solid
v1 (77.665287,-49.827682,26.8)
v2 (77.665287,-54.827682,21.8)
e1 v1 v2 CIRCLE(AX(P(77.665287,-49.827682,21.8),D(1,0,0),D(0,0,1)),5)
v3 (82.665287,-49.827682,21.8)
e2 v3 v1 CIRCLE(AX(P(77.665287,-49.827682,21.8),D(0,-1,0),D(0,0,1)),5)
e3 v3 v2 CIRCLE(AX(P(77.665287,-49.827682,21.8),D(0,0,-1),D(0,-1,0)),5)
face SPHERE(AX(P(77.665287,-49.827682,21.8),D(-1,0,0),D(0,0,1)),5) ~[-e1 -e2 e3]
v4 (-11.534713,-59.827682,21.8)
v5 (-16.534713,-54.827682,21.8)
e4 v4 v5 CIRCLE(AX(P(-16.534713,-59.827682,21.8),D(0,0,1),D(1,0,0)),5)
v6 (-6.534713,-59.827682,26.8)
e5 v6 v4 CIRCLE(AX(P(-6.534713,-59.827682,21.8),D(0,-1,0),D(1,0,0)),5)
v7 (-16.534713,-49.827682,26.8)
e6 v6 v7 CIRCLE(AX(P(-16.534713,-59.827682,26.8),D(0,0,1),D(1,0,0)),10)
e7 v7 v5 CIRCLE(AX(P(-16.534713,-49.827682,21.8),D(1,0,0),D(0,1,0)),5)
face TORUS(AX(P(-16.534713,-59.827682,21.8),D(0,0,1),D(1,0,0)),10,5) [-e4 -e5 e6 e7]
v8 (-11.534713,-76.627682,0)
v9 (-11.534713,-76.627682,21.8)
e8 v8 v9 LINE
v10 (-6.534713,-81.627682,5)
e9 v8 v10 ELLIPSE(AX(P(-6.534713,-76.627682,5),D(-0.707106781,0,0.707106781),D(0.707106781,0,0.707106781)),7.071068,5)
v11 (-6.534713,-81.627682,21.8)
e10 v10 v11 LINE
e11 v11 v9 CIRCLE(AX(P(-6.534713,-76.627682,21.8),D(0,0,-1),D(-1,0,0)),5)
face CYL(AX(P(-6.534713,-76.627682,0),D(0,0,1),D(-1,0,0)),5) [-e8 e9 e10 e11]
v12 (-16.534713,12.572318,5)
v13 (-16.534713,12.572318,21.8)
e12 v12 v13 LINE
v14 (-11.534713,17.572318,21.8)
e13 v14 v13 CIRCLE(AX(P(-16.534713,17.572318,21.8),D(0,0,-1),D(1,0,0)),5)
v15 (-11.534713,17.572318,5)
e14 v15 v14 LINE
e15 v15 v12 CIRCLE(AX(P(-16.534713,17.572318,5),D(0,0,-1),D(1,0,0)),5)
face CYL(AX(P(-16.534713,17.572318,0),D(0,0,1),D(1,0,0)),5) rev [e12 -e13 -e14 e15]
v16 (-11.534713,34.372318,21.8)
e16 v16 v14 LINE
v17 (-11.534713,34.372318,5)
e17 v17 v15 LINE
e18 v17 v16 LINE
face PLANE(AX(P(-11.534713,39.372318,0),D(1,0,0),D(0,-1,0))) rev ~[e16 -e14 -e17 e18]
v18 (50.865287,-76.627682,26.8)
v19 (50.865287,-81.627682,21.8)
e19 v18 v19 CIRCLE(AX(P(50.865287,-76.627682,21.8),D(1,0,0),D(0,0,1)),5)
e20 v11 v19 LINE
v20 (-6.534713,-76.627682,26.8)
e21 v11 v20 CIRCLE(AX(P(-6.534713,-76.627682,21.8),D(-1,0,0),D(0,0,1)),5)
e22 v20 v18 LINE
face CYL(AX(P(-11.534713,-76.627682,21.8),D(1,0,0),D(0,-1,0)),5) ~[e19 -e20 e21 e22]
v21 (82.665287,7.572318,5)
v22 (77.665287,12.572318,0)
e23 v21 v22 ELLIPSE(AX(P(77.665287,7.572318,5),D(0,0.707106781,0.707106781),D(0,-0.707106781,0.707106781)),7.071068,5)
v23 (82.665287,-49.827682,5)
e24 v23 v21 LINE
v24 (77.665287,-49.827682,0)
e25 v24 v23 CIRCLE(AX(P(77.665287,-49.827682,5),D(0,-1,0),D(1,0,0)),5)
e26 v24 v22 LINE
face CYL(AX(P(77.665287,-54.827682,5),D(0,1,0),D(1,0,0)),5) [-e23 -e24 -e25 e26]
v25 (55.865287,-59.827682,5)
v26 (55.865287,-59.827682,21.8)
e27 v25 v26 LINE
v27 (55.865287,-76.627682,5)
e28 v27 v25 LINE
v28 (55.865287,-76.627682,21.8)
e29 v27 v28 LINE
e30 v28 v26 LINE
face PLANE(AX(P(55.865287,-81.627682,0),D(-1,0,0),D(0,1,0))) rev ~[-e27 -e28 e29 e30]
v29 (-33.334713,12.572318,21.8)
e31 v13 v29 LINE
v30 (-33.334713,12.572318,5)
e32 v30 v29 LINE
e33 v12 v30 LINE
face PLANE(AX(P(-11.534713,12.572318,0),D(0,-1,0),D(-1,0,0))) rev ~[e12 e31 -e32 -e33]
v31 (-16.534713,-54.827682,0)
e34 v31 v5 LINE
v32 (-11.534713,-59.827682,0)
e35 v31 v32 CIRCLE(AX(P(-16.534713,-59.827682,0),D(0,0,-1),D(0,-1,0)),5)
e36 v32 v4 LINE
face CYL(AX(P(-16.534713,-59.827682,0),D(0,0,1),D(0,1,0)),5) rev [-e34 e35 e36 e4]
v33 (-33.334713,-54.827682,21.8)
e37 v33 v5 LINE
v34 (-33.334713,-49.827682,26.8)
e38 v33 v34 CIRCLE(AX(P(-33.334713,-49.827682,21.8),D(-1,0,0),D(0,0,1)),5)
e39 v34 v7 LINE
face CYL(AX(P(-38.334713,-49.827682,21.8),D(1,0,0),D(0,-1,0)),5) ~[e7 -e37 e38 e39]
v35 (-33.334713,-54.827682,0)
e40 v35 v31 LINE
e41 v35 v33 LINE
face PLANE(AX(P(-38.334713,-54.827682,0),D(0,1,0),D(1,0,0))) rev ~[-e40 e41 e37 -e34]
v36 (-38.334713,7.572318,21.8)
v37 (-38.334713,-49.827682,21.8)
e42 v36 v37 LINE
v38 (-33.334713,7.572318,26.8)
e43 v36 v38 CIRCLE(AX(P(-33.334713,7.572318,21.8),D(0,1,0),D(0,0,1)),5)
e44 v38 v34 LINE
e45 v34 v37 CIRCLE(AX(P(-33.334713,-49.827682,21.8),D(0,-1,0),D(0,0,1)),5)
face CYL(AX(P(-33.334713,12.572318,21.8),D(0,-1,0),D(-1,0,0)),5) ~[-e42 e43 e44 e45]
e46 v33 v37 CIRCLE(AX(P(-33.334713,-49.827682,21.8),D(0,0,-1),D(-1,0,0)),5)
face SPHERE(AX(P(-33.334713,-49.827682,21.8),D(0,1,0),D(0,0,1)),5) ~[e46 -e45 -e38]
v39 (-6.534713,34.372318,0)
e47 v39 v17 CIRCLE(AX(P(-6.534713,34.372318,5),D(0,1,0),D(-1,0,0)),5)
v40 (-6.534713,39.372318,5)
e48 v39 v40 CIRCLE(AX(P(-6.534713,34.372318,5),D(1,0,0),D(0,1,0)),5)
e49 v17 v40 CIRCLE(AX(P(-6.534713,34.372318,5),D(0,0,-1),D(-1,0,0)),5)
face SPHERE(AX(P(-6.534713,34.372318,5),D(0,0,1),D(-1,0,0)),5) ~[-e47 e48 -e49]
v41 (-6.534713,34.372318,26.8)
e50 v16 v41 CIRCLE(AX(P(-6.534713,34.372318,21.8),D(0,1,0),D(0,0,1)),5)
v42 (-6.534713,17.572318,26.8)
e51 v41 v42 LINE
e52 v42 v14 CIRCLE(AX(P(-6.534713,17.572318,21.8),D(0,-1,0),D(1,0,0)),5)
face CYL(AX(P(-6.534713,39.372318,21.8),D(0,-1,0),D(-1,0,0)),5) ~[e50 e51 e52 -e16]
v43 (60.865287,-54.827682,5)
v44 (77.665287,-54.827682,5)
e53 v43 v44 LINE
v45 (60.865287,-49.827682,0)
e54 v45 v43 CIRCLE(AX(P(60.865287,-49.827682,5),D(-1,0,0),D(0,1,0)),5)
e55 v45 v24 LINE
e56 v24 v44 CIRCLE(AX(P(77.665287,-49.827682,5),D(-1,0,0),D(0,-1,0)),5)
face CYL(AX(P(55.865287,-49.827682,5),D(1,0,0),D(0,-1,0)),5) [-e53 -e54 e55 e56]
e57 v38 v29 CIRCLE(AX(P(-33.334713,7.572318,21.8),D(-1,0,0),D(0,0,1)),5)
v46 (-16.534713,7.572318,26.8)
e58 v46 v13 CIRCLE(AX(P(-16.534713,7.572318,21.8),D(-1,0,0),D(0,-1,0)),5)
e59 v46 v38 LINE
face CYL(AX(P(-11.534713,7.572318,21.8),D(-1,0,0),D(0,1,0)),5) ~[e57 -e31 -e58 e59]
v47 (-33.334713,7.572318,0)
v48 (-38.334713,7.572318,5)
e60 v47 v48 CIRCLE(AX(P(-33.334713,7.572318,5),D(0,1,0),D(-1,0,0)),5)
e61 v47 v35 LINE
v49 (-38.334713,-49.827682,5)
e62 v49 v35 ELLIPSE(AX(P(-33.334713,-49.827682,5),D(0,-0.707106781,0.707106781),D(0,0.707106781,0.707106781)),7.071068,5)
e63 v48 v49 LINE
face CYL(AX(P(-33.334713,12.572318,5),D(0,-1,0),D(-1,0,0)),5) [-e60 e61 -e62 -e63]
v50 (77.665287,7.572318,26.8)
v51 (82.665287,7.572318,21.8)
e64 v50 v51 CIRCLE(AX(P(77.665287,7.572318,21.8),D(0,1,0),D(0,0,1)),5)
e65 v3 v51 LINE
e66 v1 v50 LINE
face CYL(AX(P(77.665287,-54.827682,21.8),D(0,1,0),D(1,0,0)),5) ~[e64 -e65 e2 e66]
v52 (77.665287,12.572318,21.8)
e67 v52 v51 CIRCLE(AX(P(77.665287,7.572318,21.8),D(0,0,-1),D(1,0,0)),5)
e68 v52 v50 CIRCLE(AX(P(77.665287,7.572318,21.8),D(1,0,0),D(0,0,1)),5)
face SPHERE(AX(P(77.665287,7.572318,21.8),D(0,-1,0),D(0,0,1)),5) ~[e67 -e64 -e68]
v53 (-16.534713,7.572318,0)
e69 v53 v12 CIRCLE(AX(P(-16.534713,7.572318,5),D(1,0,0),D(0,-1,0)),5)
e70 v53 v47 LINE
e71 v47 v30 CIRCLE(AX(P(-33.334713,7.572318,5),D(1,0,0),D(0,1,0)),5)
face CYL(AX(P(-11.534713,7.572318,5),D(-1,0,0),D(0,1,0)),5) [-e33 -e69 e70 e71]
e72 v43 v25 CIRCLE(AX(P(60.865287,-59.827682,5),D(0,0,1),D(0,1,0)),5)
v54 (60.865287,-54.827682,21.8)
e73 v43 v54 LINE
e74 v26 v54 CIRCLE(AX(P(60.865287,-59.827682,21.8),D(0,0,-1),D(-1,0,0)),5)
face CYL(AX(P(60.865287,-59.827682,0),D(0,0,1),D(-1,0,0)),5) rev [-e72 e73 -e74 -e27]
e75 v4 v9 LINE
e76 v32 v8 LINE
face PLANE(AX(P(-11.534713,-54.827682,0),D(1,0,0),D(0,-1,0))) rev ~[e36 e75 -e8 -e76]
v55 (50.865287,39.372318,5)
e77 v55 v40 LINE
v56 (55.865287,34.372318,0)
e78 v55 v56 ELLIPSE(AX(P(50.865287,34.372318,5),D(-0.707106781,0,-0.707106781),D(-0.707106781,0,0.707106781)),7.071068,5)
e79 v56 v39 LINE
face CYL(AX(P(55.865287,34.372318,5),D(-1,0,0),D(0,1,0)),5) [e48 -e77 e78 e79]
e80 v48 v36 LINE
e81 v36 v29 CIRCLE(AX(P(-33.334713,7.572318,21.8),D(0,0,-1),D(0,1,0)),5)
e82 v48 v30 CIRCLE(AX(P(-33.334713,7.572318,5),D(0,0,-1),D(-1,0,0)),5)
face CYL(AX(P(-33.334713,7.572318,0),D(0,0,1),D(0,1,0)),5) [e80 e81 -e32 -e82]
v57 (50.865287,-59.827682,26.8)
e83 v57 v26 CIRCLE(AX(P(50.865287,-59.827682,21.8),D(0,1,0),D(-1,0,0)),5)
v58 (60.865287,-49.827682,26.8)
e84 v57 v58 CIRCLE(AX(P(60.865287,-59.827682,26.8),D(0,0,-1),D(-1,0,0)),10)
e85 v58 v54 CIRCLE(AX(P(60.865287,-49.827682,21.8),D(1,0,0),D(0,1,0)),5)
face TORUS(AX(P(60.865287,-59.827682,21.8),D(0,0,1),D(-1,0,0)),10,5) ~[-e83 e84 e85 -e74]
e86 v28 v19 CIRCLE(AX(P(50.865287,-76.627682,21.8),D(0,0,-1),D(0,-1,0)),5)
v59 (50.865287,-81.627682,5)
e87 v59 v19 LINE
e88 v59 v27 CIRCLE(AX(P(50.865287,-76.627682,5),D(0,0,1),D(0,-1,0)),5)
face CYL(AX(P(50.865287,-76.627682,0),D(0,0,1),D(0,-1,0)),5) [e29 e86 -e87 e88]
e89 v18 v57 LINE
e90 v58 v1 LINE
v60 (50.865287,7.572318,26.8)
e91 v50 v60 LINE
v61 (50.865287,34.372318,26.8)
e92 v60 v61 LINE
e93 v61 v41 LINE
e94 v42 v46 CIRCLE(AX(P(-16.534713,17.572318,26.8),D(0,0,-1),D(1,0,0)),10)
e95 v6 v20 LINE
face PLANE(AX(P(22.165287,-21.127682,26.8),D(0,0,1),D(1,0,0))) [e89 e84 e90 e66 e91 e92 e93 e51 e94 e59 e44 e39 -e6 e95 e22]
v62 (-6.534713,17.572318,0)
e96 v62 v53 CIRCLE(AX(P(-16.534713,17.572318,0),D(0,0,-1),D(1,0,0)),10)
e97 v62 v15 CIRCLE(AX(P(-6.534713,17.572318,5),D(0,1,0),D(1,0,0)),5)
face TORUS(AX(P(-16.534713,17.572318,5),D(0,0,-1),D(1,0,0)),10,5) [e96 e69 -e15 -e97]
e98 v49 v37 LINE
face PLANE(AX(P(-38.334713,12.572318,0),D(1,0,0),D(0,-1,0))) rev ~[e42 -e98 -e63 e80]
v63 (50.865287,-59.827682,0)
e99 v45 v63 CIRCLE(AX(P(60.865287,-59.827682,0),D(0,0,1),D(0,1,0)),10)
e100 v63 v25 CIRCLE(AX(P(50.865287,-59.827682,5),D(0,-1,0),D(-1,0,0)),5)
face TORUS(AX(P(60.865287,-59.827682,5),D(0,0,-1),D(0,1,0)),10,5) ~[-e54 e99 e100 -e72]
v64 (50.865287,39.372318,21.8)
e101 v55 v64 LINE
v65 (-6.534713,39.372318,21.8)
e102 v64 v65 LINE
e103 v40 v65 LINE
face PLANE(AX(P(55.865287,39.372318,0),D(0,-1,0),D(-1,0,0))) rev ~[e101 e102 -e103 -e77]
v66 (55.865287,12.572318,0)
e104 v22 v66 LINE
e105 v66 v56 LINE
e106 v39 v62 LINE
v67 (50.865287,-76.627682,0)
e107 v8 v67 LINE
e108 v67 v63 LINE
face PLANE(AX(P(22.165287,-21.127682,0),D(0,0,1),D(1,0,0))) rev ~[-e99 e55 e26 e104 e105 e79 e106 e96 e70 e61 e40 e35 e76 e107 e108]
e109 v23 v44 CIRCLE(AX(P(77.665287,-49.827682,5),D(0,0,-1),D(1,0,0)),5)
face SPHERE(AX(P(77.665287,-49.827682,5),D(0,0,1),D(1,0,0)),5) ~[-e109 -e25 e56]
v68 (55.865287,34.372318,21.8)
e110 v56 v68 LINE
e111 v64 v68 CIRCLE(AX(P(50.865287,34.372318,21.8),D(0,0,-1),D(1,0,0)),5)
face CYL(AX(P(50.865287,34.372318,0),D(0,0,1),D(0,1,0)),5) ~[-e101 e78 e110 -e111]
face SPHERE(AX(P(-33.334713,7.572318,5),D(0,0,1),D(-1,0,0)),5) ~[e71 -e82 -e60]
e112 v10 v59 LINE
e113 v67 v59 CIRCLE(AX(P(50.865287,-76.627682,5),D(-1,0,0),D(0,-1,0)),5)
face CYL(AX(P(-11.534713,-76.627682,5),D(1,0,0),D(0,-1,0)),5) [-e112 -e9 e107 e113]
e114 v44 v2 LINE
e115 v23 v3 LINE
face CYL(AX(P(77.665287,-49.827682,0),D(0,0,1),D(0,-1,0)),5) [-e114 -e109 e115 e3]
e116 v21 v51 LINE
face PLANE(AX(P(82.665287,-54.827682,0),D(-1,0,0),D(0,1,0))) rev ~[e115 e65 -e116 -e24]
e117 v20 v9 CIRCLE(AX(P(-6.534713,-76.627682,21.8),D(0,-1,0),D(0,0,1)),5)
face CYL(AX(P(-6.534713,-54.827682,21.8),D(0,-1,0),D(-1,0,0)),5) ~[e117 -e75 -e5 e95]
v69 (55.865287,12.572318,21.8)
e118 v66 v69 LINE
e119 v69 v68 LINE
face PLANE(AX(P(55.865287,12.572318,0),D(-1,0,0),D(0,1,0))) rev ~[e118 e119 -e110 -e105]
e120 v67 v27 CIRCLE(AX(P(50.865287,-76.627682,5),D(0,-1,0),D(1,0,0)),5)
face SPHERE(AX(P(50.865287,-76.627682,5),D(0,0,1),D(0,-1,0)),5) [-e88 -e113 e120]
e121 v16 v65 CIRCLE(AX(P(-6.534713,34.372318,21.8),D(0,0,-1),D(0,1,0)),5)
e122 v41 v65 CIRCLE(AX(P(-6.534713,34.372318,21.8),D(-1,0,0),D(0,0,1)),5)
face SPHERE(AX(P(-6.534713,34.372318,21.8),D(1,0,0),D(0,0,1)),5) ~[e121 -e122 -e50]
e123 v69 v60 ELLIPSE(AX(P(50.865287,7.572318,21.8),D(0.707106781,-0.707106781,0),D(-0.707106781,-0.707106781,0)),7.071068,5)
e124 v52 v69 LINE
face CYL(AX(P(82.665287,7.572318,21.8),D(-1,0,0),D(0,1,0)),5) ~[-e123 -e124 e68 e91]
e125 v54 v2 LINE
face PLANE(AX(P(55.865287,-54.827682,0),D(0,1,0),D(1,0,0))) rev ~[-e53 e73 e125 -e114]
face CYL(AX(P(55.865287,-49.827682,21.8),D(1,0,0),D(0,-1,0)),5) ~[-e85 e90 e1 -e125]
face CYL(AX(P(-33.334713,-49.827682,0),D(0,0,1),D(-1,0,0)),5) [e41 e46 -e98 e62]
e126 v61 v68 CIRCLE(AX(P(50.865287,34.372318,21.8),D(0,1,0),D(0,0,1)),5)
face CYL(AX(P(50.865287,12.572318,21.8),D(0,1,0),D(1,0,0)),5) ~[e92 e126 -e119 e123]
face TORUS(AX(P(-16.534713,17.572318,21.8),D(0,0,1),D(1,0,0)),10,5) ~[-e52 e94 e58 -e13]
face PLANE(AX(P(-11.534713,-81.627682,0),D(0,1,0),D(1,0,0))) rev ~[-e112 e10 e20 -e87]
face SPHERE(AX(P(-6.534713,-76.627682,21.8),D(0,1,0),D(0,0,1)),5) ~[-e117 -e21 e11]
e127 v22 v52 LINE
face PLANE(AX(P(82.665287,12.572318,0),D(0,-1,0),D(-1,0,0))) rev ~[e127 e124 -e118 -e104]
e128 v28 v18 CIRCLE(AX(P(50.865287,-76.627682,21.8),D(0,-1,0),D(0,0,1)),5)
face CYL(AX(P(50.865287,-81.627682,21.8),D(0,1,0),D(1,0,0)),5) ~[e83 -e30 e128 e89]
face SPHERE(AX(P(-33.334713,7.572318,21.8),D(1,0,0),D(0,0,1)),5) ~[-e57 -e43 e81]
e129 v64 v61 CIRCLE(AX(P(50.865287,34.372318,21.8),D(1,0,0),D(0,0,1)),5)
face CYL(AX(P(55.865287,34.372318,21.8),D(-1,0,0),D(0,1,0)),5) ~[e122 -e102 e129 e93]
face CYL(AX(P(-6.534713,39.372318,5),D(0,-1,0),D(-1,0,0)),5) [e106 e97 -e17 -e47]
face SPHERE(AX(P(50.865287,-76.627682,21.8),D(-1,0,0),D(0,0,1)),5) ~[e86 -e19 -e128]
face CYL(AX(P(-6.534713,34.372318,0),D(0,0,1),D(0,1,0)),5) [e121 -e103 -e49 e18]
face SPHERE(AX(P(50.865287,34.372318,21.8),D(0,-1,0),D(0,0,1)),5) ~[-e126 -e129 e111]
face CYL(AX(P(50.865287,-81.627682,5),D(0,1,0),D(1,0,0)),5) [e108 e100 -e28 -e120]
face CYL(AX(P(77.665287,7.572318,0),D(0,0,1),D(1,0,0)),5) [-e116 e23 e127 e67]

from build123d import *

# Parameters (mm, degrees)
F1_DEPTH = 26.8
F2_R     = 5


with BuildPart() as f1:
    # F0 (on Top) → F1 (new body)
    with BuildSketch(Plane.XY):
        Polygon((55.8652869582, 39.3723181486), (-11.5347130418, 39.3723181486), (-11.5347130418, 12.5723181486), (-38.3347130418, 12.5723181486), (-38.3347130418, -54.8276818514), (-11.5347130418, -54.8276818514), (-11.5347130418, -81.6276818514), (55.8652869582, -81.6276818514), (55.8652869582, -54.8276818514), (82.6652869582, -54.8276818514), (82.6652869582, 12.5723181486), (55.8652869582, 12.5723181486), align=None)
    extrude(amount=F1_DEPTH)

    # F2
    f2_edges = [f1.edges().sort_by_distance(p)[0] for p in [
        (-11.534713, -68.227682, 26.8),
        (22.165287, -81.627682, 26.8),
        (55.865287, -68.227682, 26.8),
        (69.265287, -54.827682, 26.8),
        (82.665287, -21.127682, 26.8),
        (69.265287, 12.572318, 26.8),
        (55.865287, 25.972318, 26.8),
        (22.165287, 39.372318, 26.8),
        (-11.534713, 25.972318, 26.8),
        (-24.934713, 12.572318, 26.8),
        (-38.334713, -21.127682, 26.8),
        (-24.934713, -54.827682, 26.8),
        (55.865287, -81.627682, 13.4),
        (55.865287, -54.827682, 13.4),
        (82.665287, -54.827682, 13.4),
        (82.665287, 12.572318, 13.4),
        (82.665287, -21.127682, 0),
        (-11.534713, -81.627682, 13.4),
        (22.165287, -81.627682, 0),
        (-11.534713, -54.827682, 13.4),
        (69.265287, -54.827682, 0),
        (-38.334713, 12.572318, 13.4),
        (-38.334713, -54.827682, 13.4),
        (-38.334713, -21.127682, 0),
        (-11.534713, 39.372318, 13.4),
        (-11.534713, 12.572318, 13.4),
        (-11.534713, 25.972318, 0),
        (55.865287, 39.372318, 13.4),
        (22.165287, 39.372318, 0),
        (55.865287, -68.227682, 0),
        (-24.934713, 12.572318, 0),
    ]]
    fillet(f2_edges, radius=F2_R)


solid = f1.part
